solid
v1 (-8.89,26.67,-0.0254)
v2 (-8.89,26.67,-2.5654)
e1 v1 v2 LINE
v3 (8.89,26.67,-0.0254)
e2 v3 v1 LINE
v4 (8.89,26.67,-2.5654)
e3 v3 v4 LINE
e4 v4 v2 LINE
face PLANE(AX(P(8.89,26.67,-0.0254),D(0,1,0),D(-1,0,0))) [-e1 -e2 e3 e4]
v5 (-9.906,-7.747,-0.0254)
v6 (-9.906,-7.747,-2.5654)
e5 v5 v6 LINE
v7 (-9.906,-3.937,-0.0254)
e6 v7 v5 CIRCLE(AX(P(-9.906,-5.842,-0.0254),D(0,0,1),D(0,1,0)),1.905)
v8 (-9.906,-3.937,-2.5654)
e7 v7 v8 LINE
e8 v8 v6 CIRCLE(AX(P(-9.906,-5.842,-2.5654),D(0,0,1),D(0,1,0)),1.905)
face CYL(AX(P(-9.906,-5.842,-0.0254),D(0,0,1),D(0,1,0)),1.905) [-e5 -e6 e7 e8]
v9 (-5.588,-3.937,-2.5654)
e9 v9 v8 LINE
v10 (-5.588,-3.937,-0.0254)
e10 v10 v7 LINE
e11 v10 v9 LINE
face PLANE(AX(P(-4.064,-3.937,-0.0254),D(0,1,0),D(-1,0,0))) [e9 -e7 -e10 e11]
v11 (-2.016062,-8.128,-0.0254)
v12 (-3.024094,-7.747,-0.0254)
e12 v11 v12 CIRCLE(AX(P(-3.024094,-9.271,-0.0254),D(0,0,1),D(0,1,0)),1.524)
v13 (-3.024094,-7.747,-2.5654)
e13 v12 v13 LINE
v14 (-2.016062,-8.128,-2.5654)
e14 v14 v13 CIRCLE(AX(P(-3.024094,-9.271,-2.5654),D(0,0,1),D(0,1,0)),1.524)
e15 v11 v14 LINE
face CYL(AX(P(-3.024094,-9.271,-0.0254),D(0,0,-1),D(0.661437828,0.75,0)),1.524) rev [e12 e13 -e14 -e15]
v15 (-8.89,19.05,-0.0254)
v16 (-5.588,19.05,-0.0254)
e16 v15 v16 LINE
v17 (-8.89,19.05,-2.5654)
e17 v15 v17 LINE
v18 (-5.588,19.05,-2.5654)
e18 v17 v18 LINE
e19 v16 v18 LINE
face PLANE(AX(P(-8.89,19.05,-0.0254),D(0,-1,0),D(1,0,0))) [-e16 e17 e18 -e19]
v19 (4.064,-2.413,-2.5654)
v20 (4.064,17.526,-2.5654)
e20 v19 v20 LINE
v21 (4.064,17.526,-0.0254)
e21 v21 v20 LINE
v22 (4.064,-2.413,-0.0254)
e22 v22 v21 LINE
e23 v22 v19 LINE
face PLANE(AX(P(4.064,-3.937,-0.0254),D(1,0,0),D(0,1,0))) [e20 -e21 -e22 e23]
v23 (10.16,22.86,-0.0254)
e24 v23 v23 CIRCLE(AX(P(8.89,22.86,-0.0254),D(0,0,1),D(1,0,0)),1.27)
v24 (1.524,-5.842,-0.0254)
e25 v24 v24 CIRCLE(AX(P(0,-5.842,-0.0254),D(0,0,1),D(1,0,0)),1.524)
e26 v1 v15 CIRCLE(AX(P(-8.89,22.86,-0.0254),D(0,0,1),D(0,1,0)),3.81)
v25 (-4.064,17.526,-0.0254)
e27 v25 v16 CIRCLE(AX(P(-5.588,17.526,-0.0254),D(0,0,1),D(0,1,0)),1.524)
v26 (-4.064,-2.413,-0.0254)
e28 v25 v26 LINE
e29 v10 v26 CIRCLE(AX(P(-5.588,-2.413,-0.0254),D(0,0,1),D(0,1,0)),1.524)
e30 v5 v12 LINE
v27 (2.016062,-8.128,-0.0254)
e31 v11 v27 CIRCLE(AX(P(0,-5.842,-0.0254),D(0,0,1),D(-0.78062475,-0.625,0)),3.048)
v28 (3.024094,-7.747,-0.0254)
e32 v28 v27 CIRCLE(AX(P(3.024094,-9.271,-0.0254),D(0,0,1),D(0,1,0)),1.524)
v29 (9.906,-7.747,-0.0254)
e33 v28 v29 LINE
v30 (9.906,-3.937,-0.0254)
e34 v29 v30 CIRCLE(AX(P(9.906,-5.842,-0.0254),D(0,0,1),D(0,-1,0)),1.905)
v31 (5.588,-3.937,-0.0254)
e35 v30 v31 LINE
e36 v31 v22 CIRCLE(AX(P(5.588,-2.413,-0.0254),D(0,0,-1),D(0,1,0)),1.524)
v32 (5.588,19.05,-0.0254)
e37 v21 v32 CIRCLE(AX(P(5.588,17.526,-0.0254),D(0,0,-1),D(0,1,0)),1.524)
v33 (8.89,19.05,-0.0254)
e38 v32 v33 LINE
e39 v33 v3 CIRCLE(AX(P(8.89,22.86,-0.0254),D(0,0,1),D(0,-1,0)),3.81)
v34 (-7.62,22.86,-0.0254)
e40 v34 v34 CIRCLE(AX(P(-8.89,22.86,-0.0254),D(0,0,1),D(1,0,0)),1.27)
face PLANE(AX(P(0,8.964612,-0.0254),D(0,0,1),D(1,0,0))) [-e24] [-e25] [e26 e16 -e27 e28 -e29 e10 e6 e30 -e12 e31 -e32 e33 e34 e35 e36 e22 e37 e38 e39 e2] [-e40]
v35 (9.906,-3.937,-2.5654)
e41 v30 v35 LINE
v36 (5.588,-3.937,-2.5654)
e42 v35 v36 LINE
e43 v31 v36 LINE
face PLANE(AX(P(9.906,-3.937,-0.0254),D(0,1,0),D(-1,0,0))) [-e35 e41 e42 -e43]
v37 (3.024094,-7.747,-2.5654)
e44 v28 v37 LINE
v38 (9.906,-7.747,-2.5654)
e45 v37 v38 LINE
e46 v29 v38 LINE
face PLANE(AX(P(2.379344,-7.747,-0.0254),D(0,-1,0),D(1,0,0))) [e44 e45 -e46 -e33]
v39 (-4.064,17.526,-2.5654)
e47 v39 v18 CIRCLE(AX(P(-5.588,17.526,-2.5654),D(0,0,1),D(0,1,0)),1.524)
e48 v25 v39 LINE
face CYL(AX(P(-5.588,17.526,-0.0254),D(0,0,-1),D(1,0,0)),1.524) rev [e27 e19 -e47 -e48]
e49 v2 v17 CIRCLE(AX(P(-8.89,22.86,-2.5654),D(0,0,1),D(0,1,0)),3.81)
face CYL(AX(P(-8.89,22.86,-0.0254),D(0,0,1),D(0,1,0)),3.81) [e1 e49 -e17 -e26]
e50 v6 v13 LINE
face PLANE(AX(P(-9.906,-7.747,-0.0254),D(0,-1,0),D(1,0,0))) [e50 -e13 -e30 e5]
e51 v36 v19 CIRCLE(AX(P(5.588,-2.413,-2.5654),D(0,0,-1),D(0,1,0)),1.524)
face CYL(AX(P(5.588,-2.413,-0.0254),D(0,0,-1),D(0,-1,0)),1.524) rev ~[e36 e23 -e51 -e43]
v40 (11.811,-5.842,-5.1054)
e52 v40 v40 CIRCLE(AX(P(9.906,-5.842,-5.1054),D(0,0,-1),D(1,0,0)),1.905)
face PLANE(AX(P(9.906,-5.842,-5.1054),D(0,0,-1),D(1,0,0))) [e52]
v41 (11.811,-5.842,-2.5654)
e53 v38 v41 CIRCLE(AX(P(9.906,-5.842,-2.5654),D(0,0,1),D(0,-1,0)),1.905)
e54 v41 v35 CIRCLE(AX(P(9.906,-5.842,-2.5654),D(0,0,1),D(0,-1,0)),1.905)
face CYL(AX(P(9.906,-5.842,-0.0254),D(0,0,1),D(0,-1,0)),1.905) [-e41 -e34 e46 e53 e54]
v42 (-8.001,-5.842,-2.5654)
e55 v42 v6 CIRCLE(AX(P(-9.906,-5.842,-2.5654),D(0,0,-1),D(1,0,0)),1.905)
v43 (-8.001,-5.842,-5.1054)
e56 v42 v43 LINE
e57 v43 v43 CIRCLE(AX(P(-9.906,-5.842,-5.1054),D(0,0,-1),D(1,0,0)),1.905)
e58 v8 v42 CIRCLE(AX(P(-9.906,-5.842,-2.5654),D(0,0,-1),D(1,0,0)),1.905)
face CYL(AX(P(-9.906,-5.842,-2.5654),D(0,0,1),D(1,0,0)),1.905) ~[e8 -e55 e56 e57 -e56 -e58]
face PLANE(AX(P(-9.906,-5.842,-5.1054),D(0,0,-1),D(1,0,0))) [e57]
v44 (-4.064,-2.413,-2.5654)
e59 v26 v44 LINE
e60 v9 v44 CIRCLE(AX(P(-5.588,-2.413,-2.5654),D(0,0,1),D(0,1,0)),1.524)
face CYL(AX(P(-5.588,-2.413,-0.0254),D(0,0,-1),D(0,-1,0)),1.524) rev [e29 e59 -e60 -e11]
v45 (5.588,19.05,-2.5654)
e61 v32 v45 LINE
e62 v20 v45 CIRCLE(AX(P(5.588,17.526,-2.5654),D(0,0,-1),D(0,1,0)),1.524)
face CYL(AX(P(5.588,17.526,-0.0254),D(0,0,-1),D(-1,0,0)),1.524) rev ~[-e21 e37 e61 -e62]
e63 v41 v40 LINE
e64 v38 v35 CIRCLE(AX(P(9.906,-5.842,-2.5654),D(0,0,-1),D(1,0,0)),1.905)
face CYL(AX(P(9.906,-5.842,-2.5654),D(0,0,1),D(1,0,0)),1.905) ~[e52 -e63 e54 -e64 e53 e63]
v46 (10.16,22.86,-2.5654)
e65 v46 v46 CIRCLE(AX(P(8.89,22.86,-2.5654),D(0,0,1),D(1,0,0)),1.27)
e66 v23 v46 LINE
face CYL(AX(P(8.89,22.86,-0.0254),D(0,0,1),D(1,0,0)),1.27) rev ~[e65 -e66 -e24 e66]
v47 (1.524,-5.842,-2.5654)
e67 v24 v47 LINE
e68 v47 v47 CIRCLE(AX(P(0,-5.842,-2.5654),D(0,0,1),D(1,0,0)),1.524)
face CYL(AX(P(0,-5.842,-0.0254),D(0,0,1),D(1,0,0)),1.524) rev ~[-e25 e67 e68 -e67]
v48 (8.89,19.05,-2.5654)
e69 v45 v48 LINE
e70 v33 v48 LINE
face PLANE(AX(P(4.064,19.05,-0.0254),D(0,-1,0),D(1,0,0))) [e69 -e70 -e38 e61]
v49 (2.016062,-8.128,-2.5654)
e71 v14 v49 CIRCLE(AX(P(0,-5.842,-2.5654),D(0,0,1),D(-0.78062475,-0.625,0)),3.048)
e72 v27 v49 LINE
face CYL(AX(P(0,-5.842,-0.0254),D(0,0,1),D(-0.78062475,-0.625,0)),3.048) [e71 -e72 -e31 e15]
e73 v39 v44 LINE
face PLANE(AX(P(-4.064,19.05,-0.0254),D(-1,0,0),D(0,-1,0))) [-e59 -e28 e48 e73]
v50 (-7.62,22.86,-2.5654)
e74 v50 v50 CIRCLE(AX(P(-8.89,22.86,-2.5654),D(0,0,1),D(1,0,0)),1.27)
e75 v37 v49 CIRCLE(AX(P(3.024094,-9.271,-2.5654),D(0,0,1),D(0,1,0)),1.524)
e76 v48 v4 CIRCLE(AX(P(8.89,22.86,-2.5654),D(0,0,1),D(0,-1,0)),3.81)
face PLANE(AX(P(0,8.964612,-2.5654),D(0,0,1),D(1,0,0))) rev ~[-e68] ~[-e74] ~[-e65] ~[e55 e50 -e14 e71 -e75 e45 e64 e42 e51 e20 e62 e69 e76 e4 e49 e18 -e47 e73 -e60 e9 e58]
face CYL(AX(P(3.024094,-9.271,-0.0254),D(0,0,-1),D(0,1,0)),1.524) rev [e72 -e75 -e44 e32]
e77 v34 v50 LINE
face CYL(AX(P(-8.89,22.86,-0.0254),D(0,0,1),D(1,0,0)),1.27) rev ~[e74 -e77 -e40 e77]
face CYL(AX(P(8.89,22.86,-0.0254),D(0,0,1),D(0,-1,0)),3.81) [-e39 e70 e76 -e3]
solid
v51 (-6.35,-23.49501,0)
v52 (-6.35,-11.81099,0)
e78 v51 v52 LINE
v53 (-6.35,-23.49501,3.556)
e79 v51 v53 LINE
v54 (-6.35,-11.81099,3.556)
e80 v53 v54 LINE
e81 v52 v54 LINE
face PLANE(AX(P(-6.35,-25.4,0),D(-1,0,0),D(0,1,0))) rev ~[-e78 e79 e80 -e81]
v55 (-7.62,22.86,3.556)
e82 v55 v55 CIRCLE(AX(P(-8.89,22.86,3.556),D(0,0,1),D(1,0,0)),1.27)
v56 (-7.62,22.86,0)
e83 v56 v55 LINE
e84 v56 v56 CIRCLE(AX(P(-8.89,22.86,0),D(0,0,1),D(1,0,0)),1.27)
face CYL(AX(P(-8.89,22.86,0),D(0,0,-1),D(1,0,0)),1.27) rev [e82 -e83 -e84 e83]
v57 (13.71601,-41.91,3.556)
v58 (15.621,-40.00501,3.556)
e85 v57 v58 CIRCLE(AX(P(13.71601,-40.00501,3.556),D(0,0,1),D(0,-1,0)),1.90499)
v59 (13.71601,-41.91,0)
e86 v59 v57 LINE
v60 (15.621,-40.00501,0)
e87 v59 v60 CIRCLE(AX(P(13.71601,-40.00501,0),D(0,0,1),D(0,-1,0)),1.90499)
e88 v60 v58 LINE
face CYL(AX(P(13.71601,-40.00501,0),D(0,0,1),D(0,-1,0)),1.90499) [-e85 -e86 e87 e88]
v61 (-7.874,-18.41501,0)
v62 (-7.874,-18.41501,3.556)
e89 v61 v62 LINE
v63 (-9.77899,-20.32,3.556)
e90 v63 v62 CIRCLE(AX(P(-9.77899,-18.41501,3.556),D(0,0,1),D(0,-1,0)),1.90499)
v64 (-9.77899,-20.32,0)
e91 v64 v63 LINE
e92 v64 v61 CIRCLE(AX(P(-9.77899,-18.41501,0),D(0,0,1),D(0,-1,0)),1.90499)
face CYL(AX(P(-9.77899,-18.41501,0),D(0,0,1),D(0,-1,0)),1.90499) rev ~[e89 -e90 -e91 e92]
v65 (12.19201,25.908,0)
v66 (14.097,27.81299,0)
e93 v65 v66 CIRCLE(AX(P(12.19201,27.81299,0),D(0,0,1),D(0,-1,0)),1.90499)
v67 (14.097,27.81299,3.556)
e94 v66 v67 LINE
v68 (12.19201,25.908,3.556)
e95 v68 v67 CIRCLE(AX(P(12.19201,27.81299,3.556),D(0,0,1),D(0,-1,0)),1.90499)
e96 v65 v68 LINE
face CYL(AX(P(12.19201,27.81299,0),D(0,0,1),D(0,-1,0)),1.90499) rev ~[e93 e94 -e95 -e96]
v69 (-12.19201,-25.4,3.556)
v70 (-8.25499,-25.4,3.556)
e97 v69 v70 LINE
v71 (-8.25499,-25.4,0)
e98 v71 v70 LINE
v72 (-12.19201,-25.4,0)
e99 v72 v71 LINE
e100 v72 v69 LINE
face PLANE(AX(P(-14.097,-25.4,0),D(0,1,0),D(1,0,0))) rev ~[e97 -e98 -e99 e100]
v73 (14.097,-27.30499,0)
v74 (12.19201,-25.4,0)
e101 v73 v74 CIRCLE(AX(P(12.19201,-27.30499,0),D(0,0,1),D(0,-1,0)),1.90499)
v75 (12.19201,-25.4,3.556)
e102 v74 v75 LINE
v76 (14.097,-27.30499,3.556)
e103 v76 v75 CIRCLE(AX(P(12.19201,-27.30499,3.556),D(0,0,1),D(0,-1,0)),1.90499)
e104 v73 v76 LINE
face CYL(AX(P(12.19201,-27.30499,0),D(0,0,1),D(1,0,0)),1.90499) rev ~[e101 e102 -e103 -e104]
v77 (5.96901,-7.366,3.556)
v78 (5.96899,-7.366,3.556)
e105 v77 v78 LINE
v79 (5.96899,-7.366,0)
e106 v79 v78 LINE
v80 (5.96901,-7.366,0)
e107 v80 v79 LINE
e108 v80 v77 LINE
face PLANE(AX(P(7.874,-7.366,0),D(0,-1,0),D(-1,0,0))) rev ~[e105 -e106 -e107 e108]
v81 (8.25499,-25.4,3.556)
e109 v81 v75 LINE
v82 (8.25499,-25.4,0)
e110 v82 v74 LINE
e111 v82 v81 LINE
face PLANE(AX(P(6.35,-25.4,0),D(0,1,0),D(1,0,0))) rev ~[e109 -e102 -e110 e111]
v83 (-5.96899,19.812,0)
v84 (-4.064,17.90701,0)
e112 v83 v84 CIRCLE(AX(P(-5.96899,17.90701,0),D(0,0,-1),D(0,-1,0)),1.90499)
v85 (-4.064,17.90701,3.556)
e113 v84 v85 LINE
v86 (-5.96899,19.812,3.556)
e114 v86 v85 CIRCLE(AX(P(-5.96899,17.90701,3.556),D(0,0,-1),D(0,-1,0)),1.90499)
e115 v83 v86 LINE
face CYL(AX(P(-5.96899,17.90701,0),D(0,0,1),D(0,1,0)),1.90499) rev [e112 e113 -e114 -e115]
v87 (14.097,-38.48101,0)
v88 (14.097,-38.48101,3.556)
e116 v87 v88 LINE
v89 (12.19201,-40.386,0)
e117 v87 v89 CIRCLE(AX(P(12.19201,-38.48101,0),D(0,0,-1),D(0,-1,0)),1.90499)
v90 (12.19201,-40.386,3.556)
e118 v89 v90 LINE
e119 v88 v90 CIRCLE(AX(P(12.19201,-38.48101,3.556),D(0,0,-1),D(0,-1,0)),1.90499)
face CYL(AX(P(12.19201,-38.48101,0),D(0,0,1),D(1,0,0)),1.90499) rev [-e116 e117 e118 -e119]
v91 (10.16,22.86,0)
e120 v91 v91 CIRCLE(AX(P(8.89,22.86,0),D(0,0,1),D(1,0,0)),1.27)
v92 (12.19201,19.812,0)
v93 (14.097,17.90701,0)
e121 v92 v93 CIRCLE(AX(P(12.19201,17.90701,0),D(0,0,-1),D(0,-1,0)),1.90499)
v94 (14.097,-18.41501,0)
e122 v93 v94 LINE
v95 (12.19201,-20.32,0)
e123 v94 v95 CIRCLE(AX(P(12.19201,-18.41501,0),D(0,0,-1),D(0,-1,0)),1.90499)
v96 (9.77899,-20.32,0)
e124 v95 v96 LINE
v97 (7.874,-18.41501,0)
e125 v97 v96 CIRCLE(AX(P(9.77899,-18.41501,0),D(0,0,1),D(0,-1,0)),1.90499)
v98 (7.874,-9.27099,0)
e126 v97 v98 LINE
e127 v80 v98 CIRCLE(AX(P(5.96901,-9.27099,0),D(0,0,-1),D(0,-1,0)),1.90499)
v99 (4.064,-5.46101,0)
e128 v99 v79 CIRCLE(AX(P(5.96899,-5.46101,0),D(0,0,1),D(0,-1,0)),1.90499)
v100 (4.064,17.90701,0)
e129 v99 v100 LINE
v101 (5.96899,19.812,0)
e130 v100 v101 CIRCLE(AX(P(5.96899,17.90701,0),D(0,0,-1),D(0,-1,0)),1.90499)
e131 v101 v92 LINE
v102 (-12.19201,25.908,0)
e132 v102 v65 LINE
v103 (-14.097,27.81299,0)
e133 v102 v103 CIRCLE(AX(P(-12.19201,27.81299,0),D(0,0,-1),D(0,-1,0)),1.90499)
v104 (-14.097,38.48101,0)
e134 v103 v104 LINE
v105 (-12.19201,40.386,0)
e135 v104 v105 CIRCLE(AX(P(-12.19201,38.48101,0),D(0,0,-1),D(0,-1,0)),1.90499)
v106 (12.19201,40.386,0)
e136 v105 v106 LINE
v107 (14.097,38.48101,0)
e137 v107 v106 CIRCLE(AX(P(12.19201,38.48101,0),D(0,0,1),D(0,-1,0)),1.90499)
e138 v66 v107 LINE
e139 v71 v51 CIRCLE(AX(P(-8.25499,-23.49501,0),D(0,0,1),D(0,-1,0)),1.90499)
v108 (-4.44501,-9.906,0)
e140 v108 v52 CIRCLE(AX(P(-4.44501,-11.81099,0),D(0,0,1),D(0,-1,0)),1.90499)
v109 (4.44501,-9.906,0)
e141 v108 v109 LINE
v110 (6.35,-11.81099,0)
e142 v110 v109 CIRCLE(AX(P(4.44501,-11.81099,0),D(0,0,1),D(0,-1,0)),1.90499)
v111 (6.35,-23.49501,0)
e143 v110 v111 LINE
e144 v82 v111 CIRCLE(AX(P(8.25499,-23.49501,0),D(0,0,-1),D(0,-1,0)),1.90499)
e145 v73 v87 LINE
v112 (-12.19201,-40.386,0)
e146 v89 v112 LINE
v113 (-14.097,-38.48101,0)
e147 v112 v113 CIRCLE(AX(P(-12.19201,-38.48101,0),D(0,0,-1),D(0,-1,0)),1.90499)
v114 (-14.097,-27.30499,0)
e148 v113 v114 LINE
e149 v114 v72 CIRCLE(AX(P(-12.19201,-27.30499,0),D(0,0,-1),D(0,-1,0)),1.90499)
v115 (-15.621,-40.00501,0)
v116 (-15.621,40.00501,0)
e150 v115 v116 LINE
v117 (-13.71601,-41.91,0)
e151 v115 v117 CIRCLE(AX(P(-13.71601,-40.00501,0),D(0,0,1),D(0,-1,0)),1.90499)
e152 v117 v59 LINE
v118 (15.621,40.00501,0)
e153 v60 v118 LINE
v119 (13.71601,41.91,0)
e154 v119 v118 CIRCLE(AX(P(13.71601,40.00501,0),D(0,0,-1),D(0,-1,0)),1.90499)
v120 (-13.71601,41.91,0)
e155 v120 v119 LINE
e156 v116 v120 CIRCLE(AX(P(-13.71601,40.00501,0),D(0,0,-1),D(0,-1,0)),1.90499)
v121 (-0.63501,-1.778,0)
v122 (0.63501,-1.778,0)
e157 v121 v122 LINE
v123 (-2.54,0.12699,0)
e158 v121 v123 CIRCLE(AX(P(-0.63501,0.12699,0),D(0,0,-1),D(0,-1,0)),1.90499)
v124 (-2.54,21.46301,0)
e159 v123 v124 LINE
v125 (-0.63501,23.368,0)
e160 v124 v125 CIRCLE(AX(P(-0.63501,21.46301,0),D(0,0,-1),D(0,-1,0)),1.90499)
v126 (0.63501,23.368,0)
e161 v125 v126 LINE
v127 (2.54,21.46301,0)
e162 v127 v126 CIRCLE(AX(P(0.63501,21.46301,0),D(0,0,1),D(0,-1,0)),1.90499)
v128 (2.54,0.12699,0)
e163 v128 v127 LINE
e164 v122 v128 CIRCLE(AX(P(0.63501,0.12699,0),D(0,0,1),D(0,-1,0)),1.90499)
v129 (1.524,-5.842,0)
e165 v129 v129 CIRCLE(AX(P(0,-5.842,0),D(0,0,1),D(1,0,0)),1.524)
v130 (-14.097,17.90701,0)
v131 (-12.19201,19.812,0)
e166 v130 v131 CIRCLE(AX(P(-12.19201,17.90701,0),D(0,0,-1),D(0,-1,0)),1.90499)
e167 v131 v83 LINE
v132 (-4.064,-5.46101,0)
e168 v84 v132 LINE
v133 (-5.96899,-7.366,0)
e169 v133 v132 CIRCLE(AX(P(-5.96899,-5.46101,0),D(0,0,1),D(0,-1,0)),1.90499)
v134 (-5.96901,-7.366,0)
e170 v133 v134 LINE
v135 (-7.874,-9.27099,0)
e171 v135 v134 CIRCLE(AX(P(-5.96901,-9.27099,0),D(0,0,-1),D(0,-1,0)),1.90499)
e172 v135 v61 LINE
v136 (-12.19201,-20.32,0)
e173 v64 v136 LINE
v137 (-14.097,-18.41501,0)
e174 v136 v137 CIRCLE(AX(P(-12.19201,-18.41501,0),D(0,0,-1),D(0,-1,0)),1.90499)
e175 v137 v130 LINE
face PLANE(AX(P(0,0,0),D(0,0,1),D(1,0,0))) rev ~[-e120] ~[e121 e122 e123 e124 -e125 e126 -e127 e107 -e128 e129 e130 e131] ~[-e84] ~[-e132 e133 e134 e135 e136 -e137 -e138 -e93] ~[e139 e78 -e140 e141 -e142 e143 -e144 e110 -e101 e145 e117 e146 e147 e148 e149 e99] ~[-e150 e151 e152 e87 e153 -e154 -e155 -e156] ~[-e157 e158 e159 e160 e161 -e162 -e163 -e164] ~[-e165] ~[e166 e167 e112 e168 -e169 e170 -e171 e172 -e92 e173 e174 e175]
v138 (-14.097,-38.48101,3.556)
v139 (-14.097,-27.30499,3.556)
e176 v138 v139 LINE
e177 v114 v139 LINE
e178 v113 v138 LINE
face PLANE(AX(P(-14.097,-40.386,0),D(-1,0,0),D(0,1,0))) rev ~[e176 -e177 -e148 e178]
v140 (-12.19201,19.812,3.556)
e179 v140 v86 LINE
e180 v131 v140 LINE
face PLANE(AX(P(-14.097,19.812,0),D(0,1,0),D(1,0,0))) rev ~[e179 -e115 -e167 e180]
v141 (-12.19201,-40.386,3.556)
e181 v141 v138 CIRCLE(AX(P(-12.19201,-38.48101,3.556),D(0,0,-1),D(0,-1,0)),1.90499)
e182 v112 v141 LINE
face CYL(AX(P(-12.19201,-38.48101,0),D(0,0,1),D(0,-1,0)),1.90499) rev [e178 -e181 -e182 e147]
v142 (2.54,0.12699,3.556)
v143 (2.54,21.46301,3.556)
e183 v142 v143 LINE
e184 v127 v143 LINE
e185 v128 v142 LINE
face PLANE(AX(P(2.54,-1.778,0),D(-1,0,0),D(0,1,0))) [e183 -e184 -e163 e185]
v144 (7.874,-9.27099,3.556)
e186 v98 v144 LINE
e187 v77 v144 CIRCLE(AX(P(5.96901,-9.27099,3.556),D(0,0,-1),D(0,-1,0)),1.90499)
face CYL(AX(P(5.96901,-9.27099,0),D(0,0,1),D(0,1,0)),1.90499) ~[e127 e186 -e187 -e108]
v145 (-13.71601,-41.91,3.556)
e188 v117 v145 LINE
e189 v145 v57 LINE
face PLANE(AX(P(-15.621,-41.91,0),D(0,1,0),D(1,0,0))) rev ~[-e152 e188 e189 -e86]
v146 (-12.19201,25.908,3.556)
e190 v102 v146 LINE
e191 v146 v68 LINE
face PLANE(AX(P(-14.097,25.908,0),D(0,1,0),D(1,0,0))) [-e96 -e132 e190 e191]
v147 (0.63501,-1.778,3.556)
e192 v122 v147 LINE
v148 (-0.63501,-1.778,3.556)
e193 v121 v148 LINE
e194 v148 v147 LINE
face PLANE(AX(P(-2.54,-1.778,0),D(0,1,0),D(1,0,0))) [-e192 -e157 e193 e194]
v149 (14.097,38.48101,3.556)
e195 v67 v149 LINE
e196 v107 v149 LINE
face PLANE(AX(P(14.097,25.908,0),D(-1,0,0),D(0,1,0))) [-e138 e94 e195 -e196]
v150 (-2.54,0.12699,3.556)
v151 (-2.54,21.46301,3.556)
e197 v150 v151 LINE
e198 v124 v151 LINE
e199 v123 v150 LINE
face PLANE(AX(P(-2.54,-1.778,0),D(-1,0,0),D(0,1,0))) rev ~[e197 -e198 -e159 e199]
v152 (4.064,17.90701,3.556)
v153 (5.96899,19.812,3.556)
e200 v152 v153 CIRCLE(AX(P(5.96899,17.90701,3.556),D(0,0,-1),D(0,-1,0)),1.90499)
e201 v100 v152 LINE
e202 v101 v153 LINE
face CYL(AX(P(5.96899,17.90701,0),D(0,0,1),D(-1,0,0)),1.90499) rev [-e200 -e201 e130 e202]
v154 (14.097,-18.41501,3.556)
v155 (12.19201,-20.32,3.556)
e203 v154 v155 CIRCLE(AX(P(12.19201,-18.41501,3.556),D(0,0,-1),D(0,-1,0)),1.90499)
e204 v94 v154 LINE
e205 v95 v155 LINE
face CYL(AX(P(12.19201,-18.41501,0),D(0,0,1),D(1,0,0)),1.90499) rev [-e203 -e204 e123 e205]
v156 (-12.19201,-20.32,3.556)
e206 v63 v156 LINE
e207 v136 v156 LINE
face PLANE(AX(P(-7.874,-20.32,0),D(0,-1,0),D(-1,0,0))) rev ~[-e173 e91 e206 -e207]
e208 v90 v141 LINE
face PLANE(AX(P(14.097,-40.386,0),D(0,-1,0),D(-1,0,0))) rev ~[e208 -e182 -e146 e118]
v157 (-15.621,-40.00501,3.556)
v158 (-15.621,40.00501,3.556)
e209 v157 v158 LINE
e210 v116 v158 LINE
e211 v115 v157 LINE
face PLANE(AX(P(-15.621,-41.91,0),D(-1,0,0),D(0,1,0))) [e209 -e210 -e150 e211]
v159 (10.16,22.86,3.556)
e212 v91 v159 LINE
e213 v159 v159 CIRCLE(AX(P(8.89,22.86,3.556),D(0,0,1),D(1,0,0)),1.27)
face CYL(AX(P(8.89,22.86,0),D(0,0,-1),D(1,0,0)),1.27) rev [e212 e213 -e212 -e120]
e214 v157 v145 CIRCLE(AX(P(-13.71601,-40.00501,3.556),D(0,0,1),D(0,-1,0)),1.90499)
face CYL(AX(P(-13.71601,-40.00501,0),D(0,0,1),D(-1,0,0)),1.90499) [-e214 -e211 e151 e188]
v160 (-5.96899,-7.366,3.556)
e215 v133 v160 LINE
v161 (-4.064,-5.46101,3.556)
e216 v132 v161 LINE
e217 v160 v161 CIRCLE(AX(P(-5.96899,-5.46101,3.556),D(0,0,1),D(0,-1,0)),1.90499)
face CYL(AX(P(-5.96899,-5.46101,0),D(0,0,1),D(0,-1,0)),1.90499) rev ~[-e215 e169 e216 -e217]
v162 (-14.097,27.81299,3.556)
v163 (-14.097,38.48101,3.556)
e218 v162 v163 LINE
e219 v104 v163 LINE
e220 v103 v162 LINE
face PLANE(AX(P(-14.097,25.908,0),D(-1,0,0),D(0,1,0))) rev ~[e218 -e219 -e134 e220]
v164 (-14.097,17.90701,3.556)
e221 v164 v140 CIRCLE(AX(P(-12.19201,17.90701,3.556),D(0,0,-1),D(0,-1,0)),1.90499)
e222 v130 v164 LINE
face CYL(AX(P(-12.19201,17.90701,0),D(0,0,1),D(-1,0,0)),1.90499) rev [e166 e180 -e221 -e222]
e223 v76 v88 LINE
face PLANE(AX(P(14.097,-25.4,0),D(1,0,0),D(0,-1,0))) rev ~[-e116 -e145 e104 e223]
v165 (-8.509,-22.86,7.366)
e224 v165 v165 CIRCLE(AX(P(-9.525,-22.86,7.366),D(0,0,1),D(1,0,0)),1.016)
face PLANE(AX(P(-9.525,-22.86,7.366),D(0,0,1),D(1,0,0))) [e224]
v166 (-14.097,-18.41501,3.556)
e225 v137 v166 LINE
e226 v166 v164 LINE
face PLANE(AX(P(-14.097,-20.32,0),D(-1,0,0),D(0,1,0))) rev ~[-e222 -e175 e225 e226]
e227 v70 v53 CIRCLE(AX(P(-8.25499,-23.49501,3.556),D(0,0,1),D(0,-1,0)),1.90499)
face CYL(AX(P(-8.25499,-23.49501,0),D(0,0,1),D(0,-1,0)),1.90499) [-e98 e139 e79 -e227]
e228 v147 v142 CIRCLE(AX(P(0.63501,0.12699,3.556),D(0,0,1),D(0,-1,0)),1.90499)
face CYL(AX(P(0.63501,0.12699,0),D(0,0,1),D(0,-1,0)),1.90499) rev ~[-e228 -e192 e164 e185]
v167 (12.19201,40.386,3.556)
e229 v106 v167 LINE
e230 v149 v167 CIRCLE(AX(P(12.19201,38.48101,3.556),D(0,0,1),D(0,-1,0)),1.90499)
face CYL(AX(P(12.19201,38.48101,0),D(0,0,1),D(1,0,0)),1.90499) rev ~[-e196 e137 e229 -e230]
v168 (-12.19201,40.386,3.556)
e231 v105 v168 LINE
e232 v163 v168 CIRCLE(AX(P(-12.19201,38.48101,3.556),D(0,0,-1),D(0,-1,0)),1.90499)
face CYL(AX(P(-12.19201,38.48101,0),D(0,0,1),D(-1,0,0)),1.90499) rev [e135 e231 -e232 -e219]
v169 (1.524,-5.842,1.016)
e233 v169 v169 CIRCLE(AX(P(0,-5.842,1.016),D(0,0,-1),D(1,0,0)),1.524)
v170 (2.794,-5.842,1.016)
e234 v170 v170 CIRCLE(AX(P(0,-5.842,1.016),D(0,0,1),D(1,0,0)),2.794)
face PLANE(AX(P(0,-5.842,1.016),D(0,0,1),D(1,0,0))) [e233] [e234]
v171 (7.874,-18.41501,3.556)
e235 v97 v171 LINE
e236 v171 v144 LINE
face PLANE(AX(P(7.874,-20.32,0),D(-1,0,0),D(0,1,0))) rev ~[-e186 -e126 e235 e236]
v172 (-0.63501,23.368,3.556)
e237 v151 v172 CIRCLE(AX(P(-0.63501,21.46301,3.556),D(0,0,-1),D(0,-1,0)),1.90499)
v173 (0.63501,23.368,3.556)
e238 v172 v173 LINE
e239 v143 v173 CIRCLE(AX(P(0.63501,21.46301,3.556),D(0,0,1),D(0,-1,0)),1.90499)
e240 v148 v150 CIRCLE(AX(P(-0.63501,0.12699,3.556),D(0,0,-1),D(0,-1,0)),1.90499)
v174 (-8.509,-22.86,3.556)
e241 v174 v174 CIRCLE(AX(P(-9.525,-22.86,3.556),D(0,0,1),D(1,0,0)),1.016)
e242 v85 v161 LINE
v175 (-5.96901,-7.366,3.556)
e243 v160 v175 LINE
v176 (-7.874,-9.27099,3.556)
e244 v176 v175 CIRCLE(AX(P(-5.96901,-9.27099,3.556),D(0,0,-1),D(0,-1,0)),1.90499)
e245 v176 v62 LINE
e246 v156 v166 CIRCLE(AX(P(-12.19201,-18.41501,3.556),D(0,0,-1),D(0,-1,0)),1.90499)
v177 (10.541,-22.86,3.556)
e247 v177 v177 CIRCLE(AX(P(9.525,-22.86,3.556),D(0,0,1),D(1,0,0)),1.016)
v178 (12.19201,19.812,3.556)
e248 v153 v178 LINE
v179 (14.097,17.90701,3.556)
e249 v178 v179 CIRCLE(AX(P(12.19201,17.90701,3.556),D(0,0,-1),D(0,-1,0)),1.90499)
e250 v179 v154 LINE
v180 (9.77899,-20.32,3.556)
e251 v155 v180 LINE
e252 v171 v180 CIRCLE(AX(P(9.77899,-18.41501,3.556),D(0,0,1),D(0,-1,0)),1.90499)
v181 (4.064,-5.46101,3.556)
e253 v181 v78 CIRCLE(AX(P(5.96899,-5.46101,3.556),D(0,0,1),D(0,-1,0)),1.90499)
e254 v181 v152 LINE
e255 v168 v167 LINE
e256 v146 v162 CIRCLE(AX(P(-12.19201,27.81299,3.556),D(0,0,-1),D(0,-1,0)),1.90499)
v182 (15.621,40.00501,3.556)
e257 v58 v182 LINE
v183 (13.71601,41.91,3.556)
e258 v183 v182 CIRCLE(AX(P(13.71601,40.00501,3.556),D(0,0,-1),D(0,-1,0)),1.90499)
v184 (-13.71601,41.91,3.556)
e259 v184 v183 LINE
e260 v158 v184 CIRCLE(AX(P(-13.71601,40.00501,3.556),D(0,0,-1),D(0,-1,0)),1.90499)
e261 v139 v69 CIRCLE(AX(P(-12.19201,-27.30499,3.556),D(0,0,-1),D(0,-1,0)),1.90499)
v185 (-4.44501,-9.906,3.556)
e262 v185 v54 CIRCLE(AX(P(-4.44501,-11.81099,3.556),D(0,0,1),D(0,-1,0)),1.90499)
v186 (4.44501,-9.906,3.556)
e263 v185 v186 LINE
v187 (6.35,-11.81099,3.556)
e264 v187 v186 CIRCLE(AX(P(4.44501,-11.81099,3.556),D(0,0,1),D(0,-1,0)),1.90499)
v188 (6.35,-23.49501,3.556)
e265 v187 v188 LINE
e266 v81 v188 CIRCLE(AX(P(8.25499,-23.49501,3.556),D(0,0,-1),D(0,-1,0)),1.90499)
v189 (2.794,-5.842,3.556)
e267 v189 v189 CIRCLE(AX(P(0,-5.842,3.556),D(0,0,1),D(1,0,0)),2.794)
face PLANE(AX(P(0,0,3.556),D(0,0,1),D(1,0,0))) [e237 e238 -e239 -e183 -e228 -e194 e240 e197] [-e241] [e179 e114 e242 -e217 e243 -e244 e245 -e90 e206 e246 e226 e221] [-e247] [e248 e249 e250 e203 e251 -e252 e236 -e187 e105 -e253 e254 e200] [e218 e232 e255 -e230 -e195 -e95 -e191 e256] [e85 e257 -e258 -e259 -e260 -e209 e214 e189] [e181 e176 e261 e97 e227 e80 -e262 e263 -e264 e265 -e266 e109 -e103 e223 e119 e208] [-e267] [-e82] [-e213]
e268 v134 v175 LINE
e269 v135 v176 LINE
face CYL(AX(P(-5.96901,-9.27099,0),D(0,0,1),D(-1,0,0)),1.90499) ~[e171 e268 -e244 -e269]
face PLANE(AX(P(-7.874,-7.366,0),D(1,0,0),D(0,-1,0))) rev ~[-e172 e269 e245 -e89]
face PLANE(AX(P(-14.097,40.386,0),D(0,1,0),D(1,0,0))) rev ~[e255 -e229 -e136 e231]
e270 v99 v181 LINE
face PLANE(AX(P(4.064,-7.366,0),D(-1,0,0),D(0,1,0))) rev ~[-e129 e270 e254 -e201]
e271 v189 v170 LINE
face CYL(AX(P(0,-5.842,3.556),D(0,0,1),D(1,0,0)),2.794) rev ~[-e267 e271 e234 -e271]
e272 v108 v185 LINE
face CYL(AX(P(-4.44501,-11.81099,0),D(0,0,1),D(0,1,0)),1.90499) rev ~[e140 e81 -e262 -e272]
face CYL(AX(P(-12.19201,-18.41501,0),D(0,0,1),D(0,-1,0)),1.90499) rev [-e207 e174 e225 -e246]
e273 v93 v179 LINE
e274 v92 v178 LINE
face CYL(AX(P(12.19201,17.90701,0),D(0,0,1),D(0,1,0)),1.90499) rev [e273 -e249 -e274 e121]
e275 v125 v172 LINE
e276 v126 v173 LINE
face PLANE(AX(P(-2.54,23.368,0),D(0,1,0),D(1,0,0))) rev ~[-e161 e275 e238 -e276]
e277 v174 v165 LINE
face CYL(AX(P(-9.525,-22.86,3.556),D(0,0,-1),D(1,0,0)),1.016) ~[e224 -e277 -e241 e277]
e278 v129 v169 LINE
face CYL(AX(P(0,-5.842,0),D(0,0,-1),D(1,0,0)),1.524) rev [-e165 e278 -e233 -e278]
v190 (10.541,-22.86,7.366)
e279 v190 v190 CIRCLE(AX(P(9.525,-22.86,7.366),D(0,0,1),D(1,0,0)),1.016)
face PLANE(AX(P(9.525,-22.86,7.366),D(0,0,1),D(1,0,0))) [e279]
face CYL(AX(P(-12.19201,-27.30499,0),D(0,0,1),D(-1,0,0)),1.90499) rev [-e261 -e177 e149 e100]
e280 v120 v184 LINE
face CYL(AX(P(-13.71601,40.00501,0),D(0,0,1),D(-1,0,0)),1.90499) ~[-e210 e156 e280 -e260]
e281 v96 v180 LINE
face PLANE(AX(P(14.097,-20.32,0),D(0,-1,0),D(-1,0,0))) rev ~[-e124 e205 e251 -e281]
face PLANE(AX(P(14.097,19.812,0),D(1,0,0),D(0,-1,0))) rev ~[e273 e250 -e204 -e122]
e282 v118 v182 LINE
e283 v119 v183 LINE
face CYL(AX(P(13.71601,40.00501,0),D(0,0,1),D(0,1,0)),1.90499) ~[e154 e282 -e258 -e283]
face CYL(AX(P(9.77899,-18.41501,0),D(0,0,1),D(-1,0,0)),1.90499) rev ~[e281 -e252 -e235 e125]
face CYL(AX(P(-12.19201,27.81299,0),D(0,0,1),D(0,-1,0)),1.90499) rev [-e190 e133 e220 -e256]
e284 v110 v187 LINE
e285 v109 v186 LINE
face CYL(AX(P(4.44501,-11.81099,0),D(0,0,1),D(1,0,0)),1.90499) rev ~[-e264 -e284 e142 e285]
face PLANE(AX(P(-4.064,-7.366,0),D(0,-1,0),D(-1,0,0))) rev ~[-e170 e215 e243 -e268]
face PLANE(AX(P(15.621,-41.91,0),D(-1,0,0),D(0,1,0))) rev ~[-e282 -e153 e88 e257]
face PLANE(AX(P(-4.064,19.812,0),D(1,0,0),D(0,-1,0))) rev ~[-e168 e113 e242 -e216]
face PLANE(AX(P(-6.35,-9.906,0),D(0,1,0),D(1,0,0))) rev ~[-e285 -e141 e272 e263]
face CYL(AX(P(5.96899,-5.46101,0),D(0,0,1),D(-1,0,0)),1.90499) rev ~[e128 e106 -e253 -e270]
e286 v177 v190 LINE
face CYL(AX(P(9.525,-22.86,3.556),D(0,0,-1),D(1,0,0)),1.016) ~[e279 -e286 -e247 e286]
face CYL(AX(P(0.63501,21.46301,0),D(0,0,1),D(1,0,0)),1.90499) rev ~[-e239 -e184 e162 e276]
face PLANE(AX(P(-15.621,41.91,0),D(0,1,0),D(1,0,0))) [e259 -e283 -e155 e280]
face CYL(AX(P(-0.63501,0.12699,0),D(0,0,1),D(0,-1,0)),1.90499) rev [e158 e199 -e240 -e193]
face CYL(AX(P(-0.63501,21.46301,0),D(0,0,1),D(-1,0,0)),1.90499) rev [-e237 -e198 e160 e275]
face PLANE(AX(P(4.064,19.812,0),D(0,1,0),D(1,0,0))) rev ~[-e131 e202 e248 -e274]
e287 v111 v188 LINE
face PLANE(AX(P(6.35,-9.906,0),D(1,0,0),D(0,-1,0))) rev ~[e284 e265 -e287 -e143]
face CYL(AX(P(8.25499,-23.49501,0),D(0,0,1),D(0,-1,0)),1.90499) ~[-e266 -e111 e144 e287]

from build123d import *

# Parameters (mm, degrees)
F0_W      = 31.242
F0_H      = 83.82
F0_R      = 1.524
F0_R_2    = 1.27
F0_W_2    = 5.08
F0_H_2    = 25.146
F0_W_3    = 28.194
F0_H_3    = 14.478
F1_DEPTH  = 3.556
F2_R      = 1.90499
F3_R      = 1.016
F4_DEPTH  = 3.81
F5_R      = 2.794
F6_DEPTH  = 2.54
F8_R      = 1.524
F8_R_2    = 1.27
F9_DEPTH  = 2.54
F10_R     = 1.524
F11_R     = 1.905
F12_DEPTH = 2.54


# Not quite as in the source:
# - a fillet or chamfer is up to 0.001 mm smaller than in the source, because OpenCascade refuses the exact size
# - after a boolean that leaves OpenCascade's solid faulty, fix() repairs it


with BuildPart() as f1:
    # F0 (on Top) → F1 (new body)
    with BuildSketch(Plane.XY):
        Rectangle(F0_W, F0_H)
        Polygon((-14.097, -20.32), (-14.097, 19.812), (-4.064, 19.812), (-4.064, -7.366), (-7.874, -7.366), (-7.874, -20.32), align=None, mode=Mode.SUBTRACT)
        Polygon((14.097, -40.386), (-14.097, -40.386), (-14.097, -25.4), (-6.35, -25.4), (-6.35, -9.906), (6.35, -9.906), (6.35, -25.4), (14.097, -25.4), align=None, mode=Mode.SUBTRACT)
        with Locations((0, -5.842)):
            Circle(F0_R, mode=Mode.SUBTRACT)
        Polygon((4.064, 19.812), (14.097, 19.812), (14.097, -20.32), (7.874, -20.32), (7.874, -7.366), (4.064, -7.366), align=None, mode=Mode.SUBTRACT)
        with Locations((-8.89, 22.86)):
            Circle(F0_R_2, mode=Mode.SUBTRACT)
        with Locations((0, 10.795)):
            Rectangle(F0_W_2, F0_H_2, mode=Mode.SUBTRACT)
        with Locations((0, 33.147)):
            Rectangle(F0_W_3, F0_H_3, mode=Mode.SUBTRACT)
        with Locations((8.89, 22.86)):
            Circle(F0_R_2, mode=Mode.SUBTRACT)
    extrude(amount=F1_DEPTH)

    # F2 (radius 1.905 in the source; OpenCascade refuses exactly that, so slightly less here)
    f2_edges = [f1.edges().sort_by_distance(p)[0] for p in [
        (14.097, 40.386, 1.778),
        (-14.097, 40.386, 1.778),
        (-14.097, 25.908, 1.778),
        (14.097, 25.908, 1.778),
        (-15.621, 41.91, 1.778),
        (15.621, 41.91, 1.778),
        (-2.54, 23.368, 1.778),
        (-14.097, 19.812, 1.778),
        (4.064, 19.812, 1.778),
        (-4.064, 19.812, 1.778),
        (2.54, 23.368, 1.778),
        (14.097, 19.812, 1.778),
        (-7.874, -20.32, 1.778),
        (-7.874, -7.366, 1.778),
        (-4.064, -7.366, 1.778),
        (2.54, -1.778, 1.778),
        (7.874, -7.366, 1.778),
        (14.097, -20.32, 1.778),
        (14.097, -40.386, 1.778),
        (6.35, -25.4, 1.778),
        (-14.097, -20.32, 1.778),
        (7.874, -20.32, 1.778),
        (4.064, -7.366, 1.778),
        (-2.54, -1.778, 1.778),
        (-6.35, -25.4, 1.778),
        (-14.097, -40.386, 1.778),
        (-14.097, -25.4, 1.778),
        (-6.35, -9.906, 1.778),
        (14.097, -25.4, 1.778),
        (6.35, -9.906, 1.778),
        (-15.621, -41.91, 1.778),
        (15.621, -41.91, 1.778),
    ]]
    fillet(f2_edges, radius=F2_R)

    # F3 (on face) → F4 (join)
    with BuildSketch(Plane.XY.offset(3.556)):
        with Locations((-9.525, -22.86)):
            Circle(F3_R)
        with Locations((9.525, -22.86)):
            Circle(F3_R)
    extrude(amount=F4_DEPTH)

    # F5 (on face) → F6 (cut)
    with BuildSketch(Plane.XY.offset(3.556)):
        with Locations((0, -5.842)):
            Circle(F5_R)
    extrude(amount=-F6_DEPTH, mode=Mode.SUBTRACT)


with BuildPart() as f9:
    # F8 (on offset) → F9 (new body)
    with BuildSketch(Plane.XY.offset(-0.0254)):
        with BuildLine():
            Line((2.3793442374, -7.747), (9.906, -7.747))
            ThreePointArc((9.906, -7.747), (11.811, -5.842), (9.906, -3.937))
            Line((9.906, -3.937), (4.064, -3.937))
            Line((4.064, -3.937), (4.064, 19.05))
            Line((4.064, 19.05), (8.89, 19.05))
            ThreePointArc((8.89, 19.05), (12.7, 22.86), (8.89, 26.67))
            Line((8.89, 26.67), (-8.89, 26.67))
            ThreePointArc((-8.89, 26.67), (-12.7, 22.86), (-8.89, 19.05))
            Line((-8.89, 19.05), (-4.064, 19.05))
            Line((-4.064, 19.05), (-4.064, -3.937))
            Line((-4.064, -3.937), (-9.906, -3.937))
            ThreePointArc((-9.906, -3.937), (-11.811, -5.842), (-9.906, -7.747))
            Line((-9.906, -7.747), (-2.3793442374, -7.747))
            ThreePointArc((-2.3793442374, -7.747), (0, -8.89), (2.3793442374, -7.747))
        make_face()
        with Locations((0, -5.842)):
            Circle(F8_R, mode=Mode.SUBTRACT)
        with Locations((-8.89, 22.86)):
            Circle(F8_R_2, mode=Mode.SUBTRACT)
        with Locations((8.89, 22.86)):
            Circle(F8_R_2, mode=Mode.SUBTRACT)
    extrude(amount=-F9_DEPTH)

    # F10
    f10_edges = [f9.edges().sort_by_distance(p)[0] for p in [
        (-4.064, -3.937, -1.2954),
        (4.064, -3.937, -1.2954),
        (2.379344, -7.747, -1.2954),
        (-2.379344, -7.747, -1.2954),
        (-4.064, 19.05, -1.2954),
        (4.064, 19.05, -1.2954),
    ]]
    fillet(f10_edges, radius=F10_R)

    # F11 (on face) → F12 (join)
    with BuildSketch(Plane(origin=(0, 0, -2.5654), x_dir=(1, 0, 0), z_dir=(0, 0, -1))):
        with Locations((9.906, 5.842)):
            Circle(F11_R)
        with Locations((-9.906, 5.842)):
            Circle(F11_R)
    extrude(amount=F12_DEPTH)

    add(f9.part.fix(), mode=Mode.REPLACE)


solid = Compound([f1.part, f9.part])
